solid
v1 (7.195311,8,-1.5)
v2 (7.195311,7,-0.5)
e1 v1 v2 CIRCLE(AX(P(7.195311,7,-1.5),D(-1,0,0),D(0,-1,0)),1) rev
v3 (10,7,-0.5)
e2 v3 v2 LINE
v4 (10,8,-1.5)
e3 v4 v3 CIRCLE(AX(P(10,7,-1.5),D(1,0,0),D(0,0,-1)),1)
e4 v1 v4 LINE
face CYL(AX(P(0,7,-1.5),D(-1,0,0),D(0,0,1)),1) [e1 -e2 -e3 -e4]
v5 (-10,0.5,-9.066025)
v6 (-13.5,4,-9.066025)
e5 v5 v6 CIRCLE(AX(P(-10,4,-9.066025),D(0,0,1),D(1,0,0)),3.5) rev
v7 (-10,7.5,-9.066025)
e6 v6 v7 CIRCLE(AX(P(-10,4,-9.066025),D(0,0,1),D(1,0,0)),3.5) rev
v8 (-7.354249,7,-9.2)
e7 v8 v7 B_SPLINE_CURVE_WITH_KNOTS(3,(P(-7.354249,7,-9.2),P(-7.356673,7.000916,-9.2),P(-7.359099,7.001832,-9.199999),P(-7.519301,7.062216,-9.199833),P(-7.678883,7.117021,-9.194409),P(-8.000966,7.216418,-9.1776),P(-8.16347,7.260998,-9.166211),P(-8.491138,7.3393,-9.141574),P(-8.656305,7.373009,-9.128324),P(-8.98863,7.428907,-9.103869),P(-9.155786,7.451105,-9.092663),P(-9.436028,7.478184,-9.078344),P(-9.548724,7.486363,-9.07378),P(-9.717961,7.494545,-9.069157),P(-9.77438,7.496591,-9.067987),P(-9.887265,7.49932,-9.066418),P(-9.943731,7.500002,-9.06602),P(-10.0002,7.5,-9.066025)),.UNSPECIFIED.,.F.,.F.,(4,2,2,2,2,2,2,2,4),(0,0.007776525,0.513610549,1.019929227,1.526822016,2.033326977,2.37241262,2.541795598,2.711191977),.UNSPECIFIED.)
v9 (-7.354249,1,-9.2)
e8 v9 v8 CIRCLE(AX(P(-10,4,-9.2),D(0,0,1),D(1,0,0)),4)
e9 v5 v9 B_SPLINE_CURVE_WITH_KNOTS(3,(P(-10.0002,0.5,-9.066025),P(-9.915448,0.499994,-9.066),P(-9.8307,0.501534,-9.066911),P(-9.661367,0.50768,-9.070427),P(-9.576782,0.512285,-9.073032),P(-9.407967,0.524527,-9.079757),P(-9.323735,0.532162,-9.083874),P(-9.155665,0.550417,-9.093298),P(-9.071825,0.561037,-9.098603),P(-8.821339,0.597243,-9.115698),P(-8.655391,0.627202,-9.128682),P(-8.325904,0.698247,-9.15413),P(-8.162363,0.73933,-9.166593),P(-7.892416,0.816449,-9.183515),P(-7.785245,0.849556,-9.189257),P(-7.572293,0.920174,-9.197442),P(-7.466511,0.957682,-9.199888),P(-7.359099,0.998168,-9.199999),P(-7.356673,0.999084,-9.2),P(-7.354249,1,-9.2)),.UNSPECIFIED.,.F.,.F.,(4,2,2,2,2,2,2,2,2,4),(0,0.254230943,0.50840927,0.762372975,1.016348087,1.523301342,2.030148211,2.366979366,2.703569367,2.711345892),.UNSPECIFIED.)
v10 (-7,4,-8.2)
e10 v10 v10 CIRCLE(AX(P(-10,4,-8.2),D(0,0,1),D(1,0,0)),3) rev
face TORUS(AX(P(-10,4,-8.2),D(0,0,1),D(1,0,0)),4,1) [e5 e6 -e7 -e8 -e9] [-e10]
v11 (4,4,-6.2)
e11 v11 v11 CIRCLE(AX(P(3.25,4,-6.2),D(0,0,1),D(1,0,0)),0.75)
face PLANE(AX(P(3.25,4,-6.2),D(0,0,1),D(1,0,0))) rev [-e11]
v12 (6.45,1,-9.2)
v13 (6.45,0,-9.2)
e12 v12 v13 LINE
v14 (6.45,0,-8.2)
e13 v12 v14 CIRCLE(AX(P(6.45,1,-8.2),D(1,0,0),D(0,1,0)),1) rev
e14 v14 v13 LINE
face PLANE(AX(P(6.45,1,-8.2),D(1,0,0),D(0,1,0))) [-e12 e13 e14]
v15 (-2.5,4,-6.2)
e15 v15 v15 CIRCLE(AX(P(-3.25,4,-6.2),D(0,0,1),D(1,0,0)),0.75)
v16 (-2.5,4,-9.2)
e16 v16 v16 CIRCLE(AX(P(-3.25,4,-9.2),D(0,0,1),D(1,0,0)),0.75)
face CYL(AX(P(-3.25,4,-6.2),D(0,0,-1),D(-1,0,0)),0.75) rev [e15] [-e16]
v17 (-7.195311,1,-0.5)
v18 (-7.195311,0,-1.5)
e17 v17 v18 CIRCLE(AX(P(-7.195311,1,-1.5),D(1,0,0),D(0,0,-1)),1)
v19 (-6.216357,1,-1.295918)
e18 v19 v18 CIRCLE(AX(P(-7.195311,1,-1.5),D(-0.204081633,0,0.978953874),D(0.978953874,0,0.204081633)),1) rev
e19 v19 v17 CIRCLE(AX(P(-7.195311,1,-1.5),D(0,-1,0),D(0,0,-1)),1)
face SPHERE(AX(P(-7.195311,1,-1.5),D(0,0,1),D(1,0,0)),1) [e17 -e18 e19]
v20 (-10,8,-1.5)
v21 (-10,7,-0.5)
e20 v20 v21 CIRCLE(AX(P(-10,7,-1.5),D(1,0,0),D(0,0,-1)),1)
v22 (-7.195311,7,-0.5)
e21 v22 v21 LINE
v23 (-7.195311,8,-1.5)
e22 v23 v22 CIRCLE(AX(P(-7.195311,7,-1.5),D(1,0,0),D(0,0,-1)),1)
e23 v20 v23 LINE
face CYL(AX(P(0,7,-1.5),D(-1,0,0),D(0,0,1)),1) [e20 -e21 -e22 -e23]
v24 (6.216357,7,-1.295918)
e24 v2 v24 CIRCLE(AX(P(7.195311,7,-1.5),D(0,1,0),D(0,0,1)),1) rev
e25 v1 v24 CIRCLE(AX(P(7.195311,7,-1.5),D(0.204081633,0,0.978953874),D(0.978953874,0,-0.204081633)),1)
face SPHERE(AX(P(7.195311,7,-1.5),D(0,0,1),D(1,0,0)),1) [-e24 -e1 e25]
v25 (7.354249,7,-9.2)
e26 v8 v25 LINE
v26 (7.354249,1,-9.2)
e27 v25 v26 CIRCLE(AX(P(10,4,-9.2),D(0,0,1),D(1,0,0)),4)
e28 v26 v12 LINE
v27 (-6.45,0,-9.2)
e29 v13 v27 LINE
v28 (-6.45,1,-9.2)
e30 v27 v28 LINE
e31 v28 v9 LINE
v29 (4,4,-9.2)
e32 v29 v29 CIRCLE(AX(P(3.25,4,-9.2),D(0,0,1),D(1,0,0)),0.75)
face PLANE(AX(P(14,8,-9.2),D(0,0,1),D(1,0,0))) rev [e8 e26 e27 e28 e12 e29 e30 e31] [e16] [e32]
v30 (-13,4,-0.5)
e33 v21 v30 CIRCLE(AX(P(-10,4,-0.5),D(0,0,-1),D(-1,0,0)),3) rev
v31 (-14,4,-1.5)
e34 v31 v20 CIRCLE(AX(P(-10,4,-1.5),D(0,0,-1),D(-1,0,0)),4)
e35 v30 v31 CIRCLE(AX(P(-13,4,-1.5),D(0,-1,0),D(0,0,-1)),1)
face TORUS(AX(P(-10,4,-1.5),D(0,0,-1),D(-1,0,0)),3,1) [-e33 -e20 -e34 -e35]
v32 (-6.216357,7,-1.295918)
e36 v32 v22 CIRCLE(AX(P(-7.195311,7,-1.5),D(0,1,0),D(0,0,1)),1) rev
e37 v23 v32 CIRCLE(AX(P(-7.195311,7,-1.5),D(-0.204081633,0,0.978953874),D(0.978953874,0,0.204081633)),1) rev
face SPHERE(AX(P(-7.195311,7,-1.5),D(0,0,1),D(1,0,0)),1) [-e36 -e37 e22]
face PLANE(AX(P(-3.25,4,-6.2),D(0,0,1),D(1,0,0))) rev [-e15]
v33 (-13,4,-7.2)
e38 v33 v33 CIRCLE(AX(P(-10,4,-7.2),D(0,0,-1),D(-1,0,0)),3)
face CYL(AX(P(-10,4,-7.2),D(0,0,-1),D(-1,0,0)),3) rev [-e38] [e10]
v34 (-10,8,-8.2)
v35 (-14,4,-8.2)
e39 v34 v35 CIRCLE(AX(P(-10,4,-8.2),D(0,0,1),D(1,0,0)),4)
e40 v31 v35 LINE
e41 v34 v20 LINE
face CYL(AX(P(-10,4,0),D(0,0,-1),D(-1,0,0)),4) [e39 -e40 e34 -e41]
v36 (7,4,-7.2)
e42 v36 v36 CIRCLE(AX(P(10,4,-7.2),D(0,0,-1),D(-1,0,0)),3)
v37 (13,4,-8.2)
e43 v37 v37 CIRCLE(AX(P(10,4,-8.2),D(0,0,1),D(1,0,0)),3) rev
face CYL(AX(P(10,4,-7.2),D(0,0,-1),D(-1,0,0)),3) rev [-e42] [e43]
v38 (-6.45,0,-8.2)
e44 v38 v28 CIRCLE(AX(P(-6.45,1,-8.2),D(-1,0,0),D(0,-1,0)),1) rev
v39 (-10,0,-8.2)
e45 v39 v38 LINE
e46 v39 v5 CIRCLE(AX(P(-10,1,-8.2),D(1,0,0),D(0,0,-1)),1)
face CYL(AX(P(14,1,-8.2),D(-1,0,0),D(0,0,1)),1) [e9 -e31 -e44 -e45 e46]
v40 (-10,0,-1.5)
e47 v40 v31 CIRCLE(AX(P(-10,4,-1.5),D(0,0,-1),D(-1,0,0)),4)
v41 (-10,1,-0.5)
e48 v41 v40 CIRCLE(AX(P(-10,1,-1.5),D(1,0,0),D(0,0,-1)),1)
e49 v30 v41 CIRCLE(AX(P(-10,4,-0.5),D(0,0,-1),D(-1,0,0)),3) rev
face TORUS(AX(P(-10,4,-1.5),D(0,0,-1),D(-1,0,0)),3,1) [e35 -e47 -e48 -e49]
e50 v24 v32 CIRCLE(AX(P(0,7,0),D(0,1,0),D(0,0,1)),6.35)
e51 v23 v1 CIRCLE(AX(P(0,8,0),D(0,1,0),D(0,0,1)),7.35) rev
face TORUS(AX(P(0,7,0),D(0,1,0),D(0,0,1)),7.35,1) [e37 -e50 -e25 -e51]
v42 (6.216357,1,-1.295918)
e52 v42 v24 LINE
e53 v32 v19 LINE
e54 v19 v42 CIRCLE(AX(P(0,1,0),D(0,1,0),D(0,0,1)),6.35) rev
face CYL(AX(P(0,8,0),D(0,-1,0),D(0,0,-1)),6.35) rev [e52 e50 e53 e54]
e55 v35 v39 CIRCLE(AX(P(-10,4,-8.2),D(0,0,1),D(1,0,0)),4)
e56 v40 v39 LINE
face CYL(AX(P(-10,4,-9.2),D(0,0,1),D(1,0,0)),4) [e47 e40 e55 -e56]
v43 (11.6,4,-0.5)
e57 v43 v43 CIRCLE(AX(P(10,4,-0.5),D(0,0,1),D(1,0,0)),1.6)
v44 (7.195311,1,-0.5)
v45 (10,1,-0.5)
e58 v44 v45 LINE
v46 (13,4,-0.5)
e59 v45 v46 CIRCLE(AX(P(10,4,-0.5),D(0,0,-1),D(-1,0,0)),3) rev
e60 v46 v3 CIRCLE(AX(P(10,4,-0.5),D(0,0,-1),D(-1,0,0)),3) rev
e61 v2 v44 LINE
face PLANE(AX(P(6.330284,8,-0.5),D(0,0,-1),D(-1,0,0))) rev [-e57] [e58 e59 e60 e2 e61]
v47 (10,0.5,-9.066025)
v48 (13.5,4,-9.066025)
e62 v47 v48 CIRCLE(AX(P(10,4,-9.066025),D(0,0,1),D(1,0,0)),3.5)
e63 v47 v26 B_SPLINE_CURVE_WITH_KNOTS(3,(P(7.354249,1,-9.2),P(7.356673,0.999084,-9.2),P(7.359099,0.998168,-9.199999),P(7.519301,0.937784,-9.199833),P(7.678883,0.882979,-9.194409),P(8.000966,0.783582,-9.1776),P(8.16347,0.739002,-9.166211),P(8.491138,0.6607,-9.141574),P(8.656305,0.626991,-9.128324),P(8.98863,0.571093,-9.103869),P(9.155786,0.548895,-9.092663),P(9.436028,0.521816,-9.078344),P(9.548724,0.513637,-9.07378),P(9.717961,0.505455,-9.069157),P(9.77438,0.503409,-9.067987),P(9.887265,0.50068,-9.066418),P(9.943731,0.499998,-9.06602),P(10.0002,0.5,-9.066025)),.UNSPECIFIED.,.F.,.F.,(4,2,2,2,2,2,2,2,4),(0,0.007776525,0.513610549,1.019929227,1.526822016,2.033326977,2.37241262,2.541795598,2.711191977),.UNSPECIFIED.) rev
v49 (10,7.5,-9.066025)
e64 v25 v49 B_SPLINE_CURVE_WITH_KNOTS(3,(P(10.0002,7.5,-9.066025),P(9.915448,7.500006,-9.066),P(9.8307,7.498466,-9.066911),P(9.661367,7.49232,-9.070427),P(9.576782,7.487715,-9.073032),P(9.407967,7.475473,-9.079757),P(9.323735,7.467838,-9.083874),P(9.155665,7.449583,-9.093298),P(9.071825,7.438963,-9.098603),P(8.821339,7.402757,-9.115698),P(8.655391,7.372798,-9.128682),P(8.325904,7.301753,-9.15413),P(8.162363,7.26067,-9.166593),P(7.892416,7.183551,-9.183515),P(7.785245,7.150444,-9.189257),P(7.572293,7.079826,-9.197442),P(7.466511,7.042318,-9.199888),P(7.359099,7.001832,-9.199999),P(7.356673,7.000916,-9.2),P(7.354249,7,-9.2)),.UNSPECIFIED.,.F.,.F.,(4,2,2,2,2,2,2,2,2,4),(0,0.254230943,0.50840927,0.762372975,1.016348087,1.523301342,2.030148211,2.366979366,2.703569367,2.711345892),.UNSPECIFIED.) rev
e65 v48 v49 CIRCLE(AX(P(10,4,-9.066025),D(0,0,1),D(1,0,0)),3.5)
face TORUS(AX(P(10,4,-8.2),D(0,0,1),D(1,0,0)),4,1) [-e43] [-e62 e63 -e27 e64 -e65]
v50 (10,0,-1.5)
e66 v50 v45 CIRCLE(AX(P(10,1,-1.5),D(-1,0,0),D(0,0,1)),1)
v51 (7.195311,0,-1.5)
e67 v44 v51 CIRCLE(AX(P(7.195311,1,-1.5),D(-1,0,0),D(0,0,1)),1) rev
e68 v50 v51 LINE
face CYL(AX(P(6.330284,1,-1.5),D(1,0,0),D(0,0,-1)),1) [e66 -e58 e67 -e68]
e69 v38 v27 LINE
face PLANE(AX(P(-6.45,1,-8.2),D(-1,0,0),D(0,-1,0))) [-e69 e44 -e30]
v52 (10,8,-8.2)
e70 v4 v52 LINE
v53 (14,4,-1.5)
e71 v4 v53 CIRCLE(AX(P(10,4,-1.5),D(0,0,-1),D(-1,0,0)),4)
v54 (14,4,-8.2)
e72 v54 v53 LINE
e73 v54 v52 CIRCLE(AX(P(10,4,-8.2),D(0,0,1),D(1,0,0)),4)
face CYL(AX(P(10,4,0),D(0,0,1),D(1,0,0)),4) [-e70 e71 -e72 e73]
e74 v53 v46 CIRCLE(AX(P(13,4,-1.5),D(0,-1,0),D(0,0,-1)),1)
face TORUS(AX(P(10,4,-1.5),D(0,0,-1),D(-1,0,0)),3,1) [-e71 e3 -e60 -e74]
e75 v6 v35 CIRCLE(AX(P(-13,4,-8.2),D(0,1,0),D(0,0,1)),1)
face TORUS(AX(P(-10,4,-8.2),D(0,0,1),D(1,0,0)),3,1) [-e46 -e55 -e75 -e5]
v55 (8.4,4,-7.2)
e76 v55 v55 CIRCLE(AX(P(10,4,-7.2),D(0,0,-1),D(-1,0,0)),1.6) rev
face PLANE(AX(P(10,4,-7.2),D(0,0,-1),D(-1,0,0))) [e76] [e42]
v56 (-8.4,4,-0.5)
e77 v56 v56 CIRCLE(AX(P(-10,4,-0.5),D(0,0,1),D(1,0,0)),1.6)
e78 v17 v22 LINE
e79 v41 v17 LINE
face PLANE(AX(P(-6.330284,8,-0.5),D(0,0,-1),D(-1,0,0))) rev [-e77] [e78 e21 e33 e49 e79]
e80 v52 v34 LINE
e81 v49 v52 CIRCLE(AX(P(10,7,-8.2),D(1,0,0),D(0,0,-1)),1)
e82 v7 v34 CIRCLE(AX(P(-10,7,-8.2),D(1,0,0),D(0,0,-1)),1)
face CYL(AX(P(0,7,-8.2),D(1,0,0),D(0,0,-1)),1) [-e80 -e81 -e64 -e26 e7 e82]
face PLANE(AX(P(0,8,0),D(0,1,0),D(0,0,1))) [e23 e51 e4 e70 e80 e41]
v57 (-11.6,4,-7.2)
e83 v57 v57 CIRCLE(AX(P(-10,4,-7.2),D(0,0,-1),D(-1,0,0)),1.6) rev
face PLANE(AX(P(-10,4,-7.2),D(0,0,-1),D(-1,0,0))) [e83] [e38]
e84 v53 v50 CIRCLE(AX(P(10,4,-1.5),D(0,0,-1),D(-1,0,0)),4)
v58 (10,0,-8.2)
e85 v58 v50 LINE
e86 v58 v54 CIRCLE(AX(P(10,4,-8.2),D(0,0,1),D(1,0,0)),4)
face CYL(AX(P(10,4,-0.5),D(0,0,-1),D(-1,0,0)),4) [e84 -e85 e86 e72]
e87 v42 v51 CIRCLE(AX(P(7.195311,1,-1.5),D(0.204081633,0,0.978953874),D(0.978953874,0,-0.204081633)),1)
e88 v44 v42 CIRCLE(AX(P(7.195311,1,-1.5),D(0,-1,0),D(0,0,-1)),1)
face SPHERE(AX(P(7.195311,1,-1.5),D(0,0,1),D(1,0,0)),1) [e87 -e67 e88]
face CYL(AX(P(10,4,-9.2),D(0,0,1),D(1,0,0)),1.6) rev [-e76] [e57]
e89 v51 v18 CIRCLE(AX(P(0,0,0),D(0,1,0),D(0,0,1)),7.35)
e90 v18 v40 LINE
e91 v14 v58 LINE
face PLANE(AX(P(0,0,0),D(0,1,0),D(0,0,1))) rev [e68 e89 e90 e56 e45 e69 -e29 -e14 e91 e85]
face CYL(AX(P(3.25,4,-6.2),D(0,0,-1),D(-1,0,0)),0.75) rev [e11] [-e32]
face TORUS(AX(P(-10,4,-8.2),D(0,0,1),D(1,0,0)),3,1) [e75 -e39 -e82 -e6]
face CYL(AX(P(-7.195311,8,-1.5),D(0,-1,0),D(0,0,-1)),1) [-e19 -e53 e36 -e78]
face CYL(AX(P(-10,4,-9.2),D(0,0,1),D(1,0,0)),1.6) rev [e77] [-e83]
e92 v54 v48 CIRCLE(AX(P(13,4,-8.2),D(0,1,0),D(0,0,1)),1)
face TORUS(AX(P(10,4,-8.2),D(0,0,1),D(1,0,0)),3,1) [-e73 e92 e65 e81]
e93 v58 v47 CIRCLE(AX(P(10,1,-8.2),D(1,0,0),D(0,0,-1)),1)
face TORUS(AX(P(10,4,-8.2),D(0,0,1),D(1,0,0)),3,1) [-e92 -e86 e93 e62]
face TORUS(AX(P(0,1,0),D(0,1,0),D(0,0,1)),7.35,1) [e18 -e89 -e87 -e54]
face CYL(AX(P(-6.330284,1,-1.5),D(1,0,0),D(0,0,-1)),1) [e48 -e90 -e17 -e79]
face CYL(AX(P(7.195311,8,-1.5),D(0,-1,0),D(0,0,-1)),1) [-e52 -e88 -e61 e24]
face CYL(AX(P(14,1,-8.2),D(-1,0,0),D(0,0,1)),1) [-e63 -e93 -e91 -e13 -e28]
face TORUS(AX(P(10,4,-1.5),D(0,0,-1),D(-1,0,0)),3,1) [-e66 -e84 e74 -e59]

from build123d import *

# Parameters (mm, degrees)
EXTRUDE_1_DEPTH     = 8
FILLET_1_R          = 4
SKETCH_3_R          = 0.75
CUT_EXTRUDE_1_DEPTH = 3
SKETCH_4_R          = 1.6
CUT_EXTRUDE_2_DEPTH = 19.321844885
SKETCH_5_R          = 3
CUT_EXTRUDE_3_DEPTH = 2
FILLET_3_R          = 1
FILLET_2_R          = 1
SKETCH_6_W          = 12.9
SKETCH_6_H          = 1
EXTRUDE_2_DEPTH     = 1


# Some blends are built 0.0001 mm under size
with BuildPart() as part:
    # Эскиз1 → Бобышка-Вытянуть1 (new body)
    with BuildSketch(Plane(origin=(0, 0, 0), x_dir=(1, 0, 0), z_dir=(0, 1, 0))):
        with BuildLine():
            Line((14, 9.2), (-14, 9.2))
            Line((-14, 9.2), (-14, 0.5))
            Line((-14, 0.5), (-6.330284354, 0.5))
            ThreePointArc((-6.330284354, 0.5), (0, 6.35), (6.330284354, 0.5))
            Line((6.330284354, 0.5), (14, 0.5))
            Line((14, 0.5), (14, 9.2))
        make_face()
    extrude(amount=EXTRUDE_1_DEPTH)

    # Скругление1
    fillet_1_edges = [part.edges().sort_by_distance(p)[0] for p in [
        (14, 0, -4.85),
        (14, 8, -4.85),
        (-14, 0, -4.85),
        (-14, 8, -4.85),
    ]]
    fillet(fillet_1_edges, radius=FILLET_1_R - 0.0001)  # a hair under: the kernel refuses the full size

    # Эскиз3 → Вырез-Вытянуть1 (cut)
    with BuildSketch(Plane.XY.offset(-9.2)):
        with Locations((-3.25, 4)):
            Circle(SKETCH_3_R)
        with Locations((3.25, 4)):
            Circle(SKETCH_3_R)
    extrude(amount=CUT_EXTRUDE_1_DEPTH, mode=Mode.SUBTRACT)

    # Эскиз4 → Вырез-Вытянуть2 (cut, through all)
    with BuildSketch(Plane.XY.offset(-0.5)):
        with Locations((-10, 4)):
            Circle(SKETCH_4_R)
        with Locations((10, 4)):
            Circle(SKETCH_4_R)
    extrude(amount=-CUT_EXTRUDE_2_DEPTH, mode=Mode.SUBTRACT)

    # Эскиз5 → Вырез-Вытянуть3 (cut)
    with BuildSketch(Plane(origin=(0, 0, -9.2), x_dir=(-1, 0, 0), z_dir=(0, 0, -1))):
        with Locations((-10, 4)):
            Circle(SKETCH_5_R)
        with Locations((10, 4)):
            Circle(SKETCH_5_R)
    extrude(amount=-CUT_EXTRUDE_3_DEPTH, mode=Mode.SUBTRACT)

    # Скругление3
    # the kernel refuses this fillet: 1 mm, written as the material it takes off along each edge
    with BuildSketch(Plane(origin=(10.0001, 4.0001, -9.2), x_dir=(1, 0, 0), z_dir=(0, -1, 0))) as fillet_3_piece_1:
        with BuildLine():
            CenterArc((3.9999 - FILLET_3_R, FILLET_3_R), FILLET_3_R, 270, 90)
            Line((3.9999 - FILLET_3_R, 0), (3.9999, 0))
            Line((3.9999, 0), (3.9999, FILLET_3_R))
        make_face()
    revolve(axis=Axis((10.0001, 4.0001, -9.2), (0, 0, 1)), revolution_arc=90, mode=Mode.SUBTRACT)
    with BuildSketch(Plane(origin=(10.0001, 3.9999, -9.2), x_dir=(1, 0, 0), z_dir=(0, 1, 0))) as fillet_3_piece_2:
        with BuildLine():
            CenterArc((3.9999 - FILLET_3_R, -FILLET_3_R), FILLET_3_R, 0, 90)
            Line((3.9999 - FILLET_3_R, 0), (3.9999, 0))
            Line((3.9999, 0), (3.9999, -FILLET_3_R))
        make_face()
    revolve(axis=Axis((10.0001, 3.9999, -9.2), (0, 0, -1)), revolution_arc=90, mode=Mode.SUBTRACT)
    with BuildSketch(Plane(origin=(10.0001, 0, -9.2), x_dir=(0, 0, 1), z_dir=(-1, 0, 0))) as fillet_3_piece_3:
        with BuildLine():
            CenterArc((FILLET_3_R, FILLET_3_R), FILLET_3_R, 180, 90)
            Line((0, FILLET_3_R), (0, 0))
            Line((0, 0), (FILLET_3_R, 0))
        make_face()
    extrude(amount=20.0002, mode=Mode.SUBTRACT)
    with BuildSketch(Plane(origin=(-10.0001, 3.9999, -9.2), x_dir=(-1, 0, 0), z_dir=(0, 1, 0))) as fillet_3_piece_4:
        with BuildLine():
            CenterArc((3.9999 - FILLET_3_R, FILLET_3_R), FILLET_3_R, 270, 90)
            Line((3.9999, FILLET_3_R), (3.9999, 0))
            Line((3.9999, 0), (3.9999 - FILLET_3_R, 0))
        make_face()
    revolve(axis=Axis((-10.0001, 3.9999, -9.2), (0, 0, 1)), revolution_arc=90, mode=Mode.SUBTRACT)
    with BuildSketch(Plane(origin=(-10.0001, 4.0001, -9.2), x_dir=(-1, 0, 0), z_dir=(0, -1, 0))) as fillet_3_piece_5:
        with BuildLine():
            CenterArc((3.9999 - FILLET_3_R, -FILLET_3_R), FILLET_3_R, 360, 90)
            Line((3.9999, -FILLET_3_R), (3.9999, 0))
            Line((3.9999, 0), (3.9999 - FILLET_3_R, 0))
        make_face()
    revolve(axis=Axis((-10.0001, 4.0001, -9.2), (0, 0, -1)), revolution_arc=90, mode=Mode.SUBTRACT)
    with BuildSketch(Plane(origin=(10.0001, 8, -9.2), x_dir=(0, 0, 1), z_dir=(-1, 0, 0))) as fillet_3_piece_6:
        with BuildLine():
            CenterArc((FILLET_3_R, -FILLET_3_R), FILLET_3_R, 90, 90)
            Line((0, -FILLET_3_R), (0, 0))
            Line((0, 0), (FILLET_3_R, 0))
        make_face()
    extrude(amount=20.0002, mode=Mode.SUBTRACT)
    with BuildSketch(Plane(origin=(-10, 4, -9.2), x_dir=(-1, 0, 0), z_dir=(0, -1, 0))) as fillet_3_piece_7:
        with BuildLine():
            CenterArc((3 + FILLET_3_R, -FILLET_3_R), FILLET_3_R, 90, 90)
            Line((3, -FILLET_3_R), (3, 0))
            Line((3, 0), (3 + FILLET_3_R, 0))
        make_face()
    revolve(axis=Axis((-10, 4, -9.2), (0, 0, -1)), mode=Mode.SUBTRACT)
    with BuildSketch(Plane(origin=(10, 4, -9.2), x_dir=(-1, 0, 0), z_dir=(0, -1, 0))) as fillet_3_piece_8:
        with BuildLine():
            CenterArc((3 + FILLET_3_R, -FILLET_3_R), FILLET_3_R, 90, 90)
            Line((3, -FILLET_3_R), (3, 0))
            Line((3, 0), (3 + FILLET_3_R, 0))
        make_face()
    revolve(axis=Axis((10, 4, -9.2), (0, 0, -1)), mode=Mode.SUBTRACT)
    with BuildSketch(Plane(origin=(-14, 3.9999, -9.2), x_dir=(1, 0, 0), z_dir=(0, 1, 0)), Plane(origin=(14, 3.9999, -9.2), x_dir=(0, 0, 1), z_dir=(0, 1, 0))) as fillet_3_piece_9:
        with BuildLine():
            CenterArc((FILLET_3_R, -FILLET_3_R), FILLET_3_R, 90, 90)
            Line((0, -FILLET_3_R), (0, 0))
            Line((0, 0), (FILLET_3_R, 0))
        make_face()
    extrude(amount=0.0002, mode=Mode.SUBTRACT)

    # Скругление2
    fillet_2_edges = [part.edges().sort_by_distance(p)[0] for p in [
        (0, 8, -6.35),
        (6.330284354, 4, -0.5),
        (-6.330284354, 4, -0.5),
        (8.165192177, 8, -0.5),
        (-8.165192177, 0, -0.5),
        (12.828456414, 6.828456414, -0.5),
        (12.828456414, 1.171543586, -0.5),
        (-8.165192177, 8, -0.5),
        (-12.828456414, 6.828456414, -0.5),
        (-12.828456414, 1.171543586, -0.5),
        (8.165192177, 0, -0.5),
        (0, 0, -6.35),
    ]]
    fillet(fillet_2_edges, radius=FILLET_2_R)

    # Эскиз6 → Бобышка-Вытянуть2 (add)
    with BuildSketch(Plane(origin=(0, 0, -9.2), x_dir=(-1, 0, 0), z_dir=(0, 0, -1))):
        with Locations((0, 0.5)):
            Rectangle(SKETCH_6_W, SKETCH_6_H)
    extrude(amount=-EXTRUDE_2_DEPTH)


solid = part.part
